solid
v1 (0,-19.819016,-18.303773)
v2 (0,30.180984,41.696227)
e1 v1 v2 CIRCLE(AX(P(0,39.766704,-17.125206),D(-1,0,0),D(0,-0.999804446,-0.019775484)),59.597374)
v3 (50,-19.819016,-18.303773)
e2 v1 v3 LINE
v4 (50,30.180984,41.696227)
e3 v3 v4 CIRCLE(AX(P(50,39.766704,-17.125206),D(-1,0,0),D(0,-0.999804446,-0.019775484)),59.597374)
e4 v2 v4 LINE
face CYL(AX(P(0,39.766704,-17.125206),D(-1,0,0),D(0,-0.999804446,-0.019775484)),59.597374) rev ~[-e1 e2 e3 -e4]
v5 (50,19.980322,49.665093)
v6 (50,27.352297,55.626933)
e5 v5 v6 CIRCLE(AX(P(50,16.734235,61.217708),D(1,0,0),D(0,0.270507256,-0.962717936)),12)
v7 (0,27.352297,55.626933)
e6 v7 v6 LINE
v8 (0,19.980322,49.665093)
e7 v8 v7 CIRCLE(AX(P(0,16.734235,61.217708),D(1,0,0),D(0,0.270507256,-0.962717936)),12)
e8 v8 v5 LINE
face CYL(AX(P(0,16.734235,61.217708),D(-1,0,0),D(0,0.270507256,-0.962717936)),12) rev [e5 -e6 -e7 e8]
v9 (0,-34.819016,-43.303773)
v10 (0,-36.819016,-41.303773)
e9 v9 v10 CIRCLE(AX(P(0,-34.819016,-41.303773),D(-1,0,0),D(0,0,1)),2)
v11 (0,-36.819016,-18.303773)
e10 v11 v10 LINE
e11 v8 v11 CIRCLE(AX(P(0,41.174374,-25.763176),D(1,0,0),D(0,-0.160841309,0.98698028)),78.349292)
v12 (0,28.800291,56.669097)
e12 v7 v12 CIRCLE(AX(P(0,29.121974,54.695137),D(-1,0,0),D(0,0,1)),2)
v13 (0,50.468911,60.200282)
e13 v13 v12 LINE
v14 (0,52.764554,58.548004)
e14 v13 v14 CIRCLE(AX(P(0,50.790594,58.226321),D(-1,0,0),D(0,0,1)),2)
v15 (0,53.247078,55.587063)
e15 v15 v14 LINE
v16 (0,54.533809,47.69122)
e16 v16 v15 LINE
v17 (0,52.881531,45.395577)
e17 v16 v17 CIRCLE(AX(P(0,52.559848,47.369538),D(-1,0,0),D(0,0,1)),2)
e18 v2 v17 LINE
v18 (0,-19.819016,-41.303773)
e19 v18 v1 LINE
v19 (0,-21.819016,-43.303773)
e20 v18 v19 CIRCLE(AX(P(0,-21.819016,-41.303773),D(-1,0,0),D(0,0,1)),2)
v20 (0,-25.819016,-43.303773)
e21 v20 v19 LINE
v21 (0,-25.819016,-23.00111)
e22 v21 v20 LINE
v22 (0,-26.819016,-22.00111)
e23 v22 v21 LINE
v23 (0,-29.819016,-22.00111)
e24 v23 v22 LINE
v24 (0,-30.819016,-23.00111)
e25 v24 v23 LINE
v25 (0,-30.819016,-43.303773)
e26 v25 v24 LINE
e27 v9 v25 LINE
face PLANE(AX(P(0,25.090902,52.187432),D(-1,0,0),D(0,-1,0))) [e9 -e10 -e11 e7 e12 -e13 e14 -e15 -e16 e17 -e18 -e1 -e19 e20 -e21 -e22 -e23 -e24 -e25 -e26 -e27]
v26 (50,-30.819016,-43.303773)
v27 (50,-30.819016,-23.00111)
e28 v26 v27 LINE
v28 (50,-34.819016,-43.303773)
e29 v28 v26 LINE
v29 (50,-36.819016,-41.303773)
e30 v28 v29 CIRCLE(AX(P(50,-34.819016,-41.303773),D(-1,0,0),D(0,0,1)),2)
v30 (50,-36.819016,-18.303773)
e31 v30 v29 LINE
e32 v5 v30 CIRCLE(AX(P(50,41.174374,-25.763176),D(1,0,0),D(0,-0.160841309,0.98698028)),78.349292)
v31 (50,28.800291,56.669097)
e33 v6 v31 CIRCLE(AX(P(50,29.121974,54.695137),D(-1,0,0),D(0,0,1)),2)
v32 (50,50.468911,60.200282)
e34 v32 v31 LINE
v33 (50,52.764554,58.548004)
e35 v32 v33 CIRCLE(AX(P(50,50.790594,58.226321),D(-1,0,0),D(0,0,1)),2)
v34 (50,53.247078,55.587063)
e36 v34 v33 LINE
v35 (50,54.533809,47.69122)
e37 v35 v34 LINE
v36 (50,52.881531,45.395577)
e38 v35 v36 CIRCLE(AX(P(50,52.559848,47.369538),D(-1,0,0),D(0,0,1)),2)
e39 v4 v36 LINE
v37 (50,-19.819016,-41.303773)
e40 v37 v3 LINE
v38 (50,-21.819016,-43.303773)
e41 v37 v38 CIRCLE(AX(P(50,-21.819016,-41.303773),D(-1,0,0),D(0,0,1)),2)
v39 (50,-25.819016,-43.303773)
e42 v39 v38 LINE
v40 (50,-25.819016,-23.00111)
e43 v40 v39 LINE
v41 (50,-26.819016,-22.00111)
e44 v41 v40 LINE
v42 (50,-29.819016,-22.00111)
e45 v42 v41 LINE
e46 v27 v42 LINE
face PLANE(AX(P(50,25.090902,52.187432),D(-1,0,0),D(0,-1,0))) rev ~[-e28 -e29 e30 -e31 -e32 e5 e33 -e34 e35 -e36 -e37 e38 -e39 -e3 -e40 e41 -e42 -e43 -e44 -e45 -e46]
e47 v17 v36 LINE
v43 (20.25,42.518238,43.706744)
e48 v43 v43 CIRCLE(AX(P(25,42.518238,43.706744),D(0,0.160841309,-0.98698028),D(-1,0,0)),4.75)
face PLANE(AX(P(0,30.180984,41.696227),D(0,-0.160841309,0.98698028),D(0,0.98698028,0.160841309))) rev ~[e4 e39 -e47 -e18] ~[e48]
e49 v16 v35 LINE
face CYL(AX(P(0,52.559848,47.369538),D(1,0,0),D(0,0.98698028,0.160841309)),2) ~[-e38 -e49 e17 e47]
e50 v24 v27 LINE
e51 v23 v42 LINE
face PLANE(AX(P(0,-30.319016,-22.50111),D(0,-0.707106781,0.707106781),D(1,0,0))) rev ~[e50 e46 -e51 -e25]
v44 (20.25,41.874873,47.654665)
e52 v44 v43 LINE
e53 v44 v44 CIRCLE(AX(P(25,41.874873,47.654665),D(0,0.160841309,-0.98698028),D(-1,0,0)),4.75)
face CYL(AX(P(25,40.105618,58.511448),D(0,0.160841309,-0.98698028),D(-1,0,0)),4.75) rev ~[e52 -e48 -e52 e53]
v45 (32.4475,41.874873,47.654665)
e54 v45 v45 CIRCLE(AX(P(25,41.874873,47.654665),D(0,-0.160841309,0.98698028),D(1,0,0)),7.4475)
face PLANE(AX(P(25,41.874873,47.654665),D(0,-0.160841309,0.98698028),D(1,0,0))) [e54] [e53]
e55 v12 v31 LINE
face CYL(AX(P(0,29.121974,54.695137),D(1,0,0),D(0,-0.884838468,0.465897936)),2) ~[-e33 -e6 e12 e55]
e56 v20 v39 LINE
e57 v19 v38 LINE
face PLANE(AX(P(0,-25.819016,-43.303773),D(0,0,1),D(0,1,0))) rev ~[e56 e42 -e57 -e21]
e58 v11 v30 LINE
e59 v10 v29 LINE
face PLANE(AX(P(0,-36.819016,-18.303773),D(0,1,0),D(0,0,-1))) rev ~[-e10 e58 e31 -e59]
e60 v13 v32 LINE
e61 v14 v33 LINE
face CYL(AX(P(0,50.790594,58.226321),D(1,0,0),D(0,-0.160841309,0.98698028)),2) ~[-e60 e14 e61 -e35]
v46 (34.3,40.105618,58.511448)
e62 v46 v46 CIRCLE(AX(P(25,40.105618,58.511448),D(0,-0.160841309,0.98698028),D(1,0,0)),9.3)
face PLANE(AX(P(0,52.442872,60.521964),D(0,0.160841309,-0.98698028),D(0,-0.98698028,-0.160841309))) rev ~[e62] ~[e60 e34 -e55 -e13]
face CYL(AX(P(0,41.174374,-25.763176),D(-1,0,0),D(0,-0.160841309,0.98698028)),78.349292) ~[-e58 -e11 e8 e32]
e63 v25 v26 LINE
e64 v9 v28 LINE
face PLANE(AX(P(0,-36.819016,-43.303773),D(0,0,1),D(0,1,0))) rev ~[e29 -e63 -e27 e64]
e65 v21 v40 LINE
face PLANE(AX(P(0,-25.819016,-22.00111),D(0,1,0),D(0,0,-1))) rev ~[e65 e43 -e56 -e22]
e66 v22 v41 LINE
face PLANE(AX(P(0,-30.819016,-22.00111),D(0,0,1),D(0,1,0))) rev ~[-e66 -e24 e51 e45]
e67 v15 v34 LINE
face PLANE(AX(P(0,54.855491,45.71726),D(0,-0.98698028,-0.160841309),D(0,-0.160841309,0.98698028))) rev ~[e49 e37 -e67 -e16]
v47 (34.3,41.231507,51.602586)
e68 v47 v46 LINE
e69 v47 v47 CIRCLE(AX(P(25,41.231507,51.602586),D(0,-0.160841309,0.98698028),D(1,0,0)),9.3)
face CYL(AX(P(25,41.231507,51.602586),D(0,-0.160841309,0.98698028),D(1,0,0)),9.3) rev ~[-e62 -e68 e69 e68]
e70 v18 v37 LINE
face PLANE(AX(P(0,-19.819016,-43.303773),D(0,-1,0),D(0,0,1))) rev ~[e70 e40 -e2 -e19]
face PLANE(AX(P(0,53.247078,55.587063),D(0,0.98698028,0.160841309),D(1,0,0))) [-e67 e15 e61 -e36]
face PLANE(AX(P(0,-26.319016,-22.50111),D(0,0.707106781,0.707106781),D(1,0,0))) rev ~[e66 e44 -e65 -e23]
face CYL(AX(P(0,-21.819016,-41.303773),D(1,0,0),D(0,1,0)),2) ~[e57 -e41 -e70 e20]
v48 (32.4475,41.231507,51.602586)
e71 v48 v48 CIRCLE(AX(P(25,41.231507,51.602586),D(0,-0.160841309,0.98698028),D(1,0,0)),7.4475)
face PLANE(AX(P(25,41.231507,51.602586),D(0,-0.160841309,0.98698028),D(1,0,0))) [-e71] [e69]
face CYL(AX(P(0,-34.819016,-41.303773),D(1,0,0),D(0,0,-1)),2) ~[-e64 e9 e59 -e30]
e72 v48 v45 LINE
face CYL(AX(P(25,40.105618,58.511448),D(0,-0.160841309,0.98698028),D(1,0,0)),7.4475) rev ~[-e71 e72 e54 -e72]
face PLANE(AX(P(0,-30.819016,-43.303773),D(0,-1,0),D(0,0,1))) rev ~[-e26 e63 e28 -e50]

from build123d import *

# Parameters (mm, degrees)
F1_DEPTH       = 50
F2_DEPTH       = 5
F4_D           = 9.5
F4_CBORE_D     = 18.6
F4_CBORE_DEPTH = 7
F5_T1_DEPTH    = 50
F6_R           = 2
F7_R           = 2
F8_R           = 2
F9_R           = 2
F10_R          = 2
F11_SIZE       = 1
F12_SIZE       = 1
F3_R           = 7.4475
F3_R_2         = 4.7406141581
F13_DEPTH      = 11


# Not quite as in the source:
# - a fillet or chamfer that OpenCascade refuses, or shapes differently, is made with other operations: its cross-section is extruded or revolved along the edge and cut away or added
# - a feature names something its author has since deleted; it is built from what else it names


with BuildPart() as f1:
    # F0 (on Right) → F1 (new body)
    with BuildSketch(Plane.YZ):
        with BuildLine():
            Line((-36.8190155774, -18.3037728071), (-36.8190155774, -43.3037728071))
            Line((-36.8190155774, -43.3037728071), (-30.8190155774, -43.3037728071))
            Line((-30.8190155774, -43.3037728071), (-30.8190155774, -22.0011100173))
            Line((-30.8190155774, -22.0011100173), (-25.8190155774, -22.0011100173))
            Line((-25.8190155774, -22.0011100173), (-25.8190155774, -43.3037728071))
            Line((-25.8190155774, -43.3037728071), (-19.8190155774, -43.3037728071))
            Line((-19.8190155774, -43.3037728071), (-19.8190155774, -18.3037728071))
            ThreePointArc((-19.8190155774, -18.3037728071), (-6.0172669539, 21.0281033399), (30.1809844226, 41.6962271929))
            Line((30.1809844226, 41.6962271929), (54.8554914248, 45.7172599205))
            Line((54.8554914248, 45.7172599205), (53.2470783337, 55.5870627214))
            Line((53.2470783337, 55.5870627214), (28.5725713315, 51.5660299938))
            ThreePointArc((28.5725713315, 51.5660299938), (-16.0298177258, 27.7745861378), (-36.8190155774, -18.3037728071))
        make_face()
    extrude(amount=F1_DEPTH)

    # F2 (add): a face of the model
    f2_faces = [f1.faces().sort_by_distance(p)[0] for p in [
        (25, 40.9098248326, 53.5765463576),
    ]]
    extrude(f2_faces, amount=F2_DEPTH)

    # F4 (through all)
    with Locations(Plane(origin=(0, -8.2509991118, 50.6311062727), x_dir=(1, 0, 0), z_dir=(0, -0.1608413091, 0.9869802801))):
        with Locations((25, 48.9945122253)):
            CounterBoreHole(F4_D / 2, F4_CBORE_D / 2, F4_CBORE_DEPTH)

    # F5: fillet of radius 12 on 1 edges, made by hand

    # F5_s2 → F5_t1 (join)
    with BuildSketch(Plane.YZ):
        with BuildLine():
            ThreePointArc((19.9803220456, 49.6650925191), (24.650251765, 52.1990228082), (27.768364786, 56.5009313942))
            Line((27.768364786, 56.5009313942), (28.5725713315, 51.5660299938))
            ThreePointArc((28.5725713315, 51.5660299938), (24.2497369804, 50.7362893045), (19.9803220456, 49.6650925191))
        make_face()
    extrude(amount=F5_T1_DEPTH)

    # F6
    f6_edges = [f1.edges().sort_by_distance(p)[0] for p in [
        (25, 27.768365, 56.500931),
    ]]
    fillet(f6_edges, radius=F6_R)

    # F7
    f7_edges = [f1.edges().sort_by_distance(p)[0] for p in [
        (25, 52.442872, 60.521964),
    ]]
    fillet(f7_edges, radius=F7_R)

    # F8
    f8_edges = [f1.edges().sort_by_distance(p)[0] for p in [
        (25, 54.855491, 45.71726),
    ]]
    fillet(f8_edges, radius=F8_R)

    # F9
    f9_edges = [f1.edges().sort_by_distance(p)[0] for p in [
        (25, -19.819016, -43.303773),
    ]]
    fillet(f9_edges, radius=F9_R)

    # F10
    f10_edges = [f1.edges().sort_by_distance(p)[0] for p in [
        (25, -36.819016, -43.303773),
    ]]
    fillet(f10_edges, radius=F10_R)

    # F11
    f11_edges = [f1.edges().sort_by_distance(p)[0] for p in [
        (25, -30.819016, -22.00111),
    ]]
    chamfer(f11_edges, length=F11_SIZE)

    # F12
    f12_edges = [f1.edges().sort_by_distance(p)[0] for p in [
        (25, -25.819016, -22.00111),
    ]]
    chamfer(f12_edges, length=F12_SIZE)

    # F3 (on face) → F13 (cut)
    with BuildSketch(Plane(origin=(0, -8.2509991118, 50.6311062727), x_dir=(1, 0, 0), z_dir=(0, -0.1608413091, 0.9869802801))):
        with Locations((25, 48.9945122253)):
            Circle(F3_R)
        with Locations((25, 48.9945122253)):
            Circle(F3_R_2, mode=Mode.SUBTRACT)
    extrude(amount=-F13_DEPTH, mode=Mode.SUBTRACT)


solid = f1.part
